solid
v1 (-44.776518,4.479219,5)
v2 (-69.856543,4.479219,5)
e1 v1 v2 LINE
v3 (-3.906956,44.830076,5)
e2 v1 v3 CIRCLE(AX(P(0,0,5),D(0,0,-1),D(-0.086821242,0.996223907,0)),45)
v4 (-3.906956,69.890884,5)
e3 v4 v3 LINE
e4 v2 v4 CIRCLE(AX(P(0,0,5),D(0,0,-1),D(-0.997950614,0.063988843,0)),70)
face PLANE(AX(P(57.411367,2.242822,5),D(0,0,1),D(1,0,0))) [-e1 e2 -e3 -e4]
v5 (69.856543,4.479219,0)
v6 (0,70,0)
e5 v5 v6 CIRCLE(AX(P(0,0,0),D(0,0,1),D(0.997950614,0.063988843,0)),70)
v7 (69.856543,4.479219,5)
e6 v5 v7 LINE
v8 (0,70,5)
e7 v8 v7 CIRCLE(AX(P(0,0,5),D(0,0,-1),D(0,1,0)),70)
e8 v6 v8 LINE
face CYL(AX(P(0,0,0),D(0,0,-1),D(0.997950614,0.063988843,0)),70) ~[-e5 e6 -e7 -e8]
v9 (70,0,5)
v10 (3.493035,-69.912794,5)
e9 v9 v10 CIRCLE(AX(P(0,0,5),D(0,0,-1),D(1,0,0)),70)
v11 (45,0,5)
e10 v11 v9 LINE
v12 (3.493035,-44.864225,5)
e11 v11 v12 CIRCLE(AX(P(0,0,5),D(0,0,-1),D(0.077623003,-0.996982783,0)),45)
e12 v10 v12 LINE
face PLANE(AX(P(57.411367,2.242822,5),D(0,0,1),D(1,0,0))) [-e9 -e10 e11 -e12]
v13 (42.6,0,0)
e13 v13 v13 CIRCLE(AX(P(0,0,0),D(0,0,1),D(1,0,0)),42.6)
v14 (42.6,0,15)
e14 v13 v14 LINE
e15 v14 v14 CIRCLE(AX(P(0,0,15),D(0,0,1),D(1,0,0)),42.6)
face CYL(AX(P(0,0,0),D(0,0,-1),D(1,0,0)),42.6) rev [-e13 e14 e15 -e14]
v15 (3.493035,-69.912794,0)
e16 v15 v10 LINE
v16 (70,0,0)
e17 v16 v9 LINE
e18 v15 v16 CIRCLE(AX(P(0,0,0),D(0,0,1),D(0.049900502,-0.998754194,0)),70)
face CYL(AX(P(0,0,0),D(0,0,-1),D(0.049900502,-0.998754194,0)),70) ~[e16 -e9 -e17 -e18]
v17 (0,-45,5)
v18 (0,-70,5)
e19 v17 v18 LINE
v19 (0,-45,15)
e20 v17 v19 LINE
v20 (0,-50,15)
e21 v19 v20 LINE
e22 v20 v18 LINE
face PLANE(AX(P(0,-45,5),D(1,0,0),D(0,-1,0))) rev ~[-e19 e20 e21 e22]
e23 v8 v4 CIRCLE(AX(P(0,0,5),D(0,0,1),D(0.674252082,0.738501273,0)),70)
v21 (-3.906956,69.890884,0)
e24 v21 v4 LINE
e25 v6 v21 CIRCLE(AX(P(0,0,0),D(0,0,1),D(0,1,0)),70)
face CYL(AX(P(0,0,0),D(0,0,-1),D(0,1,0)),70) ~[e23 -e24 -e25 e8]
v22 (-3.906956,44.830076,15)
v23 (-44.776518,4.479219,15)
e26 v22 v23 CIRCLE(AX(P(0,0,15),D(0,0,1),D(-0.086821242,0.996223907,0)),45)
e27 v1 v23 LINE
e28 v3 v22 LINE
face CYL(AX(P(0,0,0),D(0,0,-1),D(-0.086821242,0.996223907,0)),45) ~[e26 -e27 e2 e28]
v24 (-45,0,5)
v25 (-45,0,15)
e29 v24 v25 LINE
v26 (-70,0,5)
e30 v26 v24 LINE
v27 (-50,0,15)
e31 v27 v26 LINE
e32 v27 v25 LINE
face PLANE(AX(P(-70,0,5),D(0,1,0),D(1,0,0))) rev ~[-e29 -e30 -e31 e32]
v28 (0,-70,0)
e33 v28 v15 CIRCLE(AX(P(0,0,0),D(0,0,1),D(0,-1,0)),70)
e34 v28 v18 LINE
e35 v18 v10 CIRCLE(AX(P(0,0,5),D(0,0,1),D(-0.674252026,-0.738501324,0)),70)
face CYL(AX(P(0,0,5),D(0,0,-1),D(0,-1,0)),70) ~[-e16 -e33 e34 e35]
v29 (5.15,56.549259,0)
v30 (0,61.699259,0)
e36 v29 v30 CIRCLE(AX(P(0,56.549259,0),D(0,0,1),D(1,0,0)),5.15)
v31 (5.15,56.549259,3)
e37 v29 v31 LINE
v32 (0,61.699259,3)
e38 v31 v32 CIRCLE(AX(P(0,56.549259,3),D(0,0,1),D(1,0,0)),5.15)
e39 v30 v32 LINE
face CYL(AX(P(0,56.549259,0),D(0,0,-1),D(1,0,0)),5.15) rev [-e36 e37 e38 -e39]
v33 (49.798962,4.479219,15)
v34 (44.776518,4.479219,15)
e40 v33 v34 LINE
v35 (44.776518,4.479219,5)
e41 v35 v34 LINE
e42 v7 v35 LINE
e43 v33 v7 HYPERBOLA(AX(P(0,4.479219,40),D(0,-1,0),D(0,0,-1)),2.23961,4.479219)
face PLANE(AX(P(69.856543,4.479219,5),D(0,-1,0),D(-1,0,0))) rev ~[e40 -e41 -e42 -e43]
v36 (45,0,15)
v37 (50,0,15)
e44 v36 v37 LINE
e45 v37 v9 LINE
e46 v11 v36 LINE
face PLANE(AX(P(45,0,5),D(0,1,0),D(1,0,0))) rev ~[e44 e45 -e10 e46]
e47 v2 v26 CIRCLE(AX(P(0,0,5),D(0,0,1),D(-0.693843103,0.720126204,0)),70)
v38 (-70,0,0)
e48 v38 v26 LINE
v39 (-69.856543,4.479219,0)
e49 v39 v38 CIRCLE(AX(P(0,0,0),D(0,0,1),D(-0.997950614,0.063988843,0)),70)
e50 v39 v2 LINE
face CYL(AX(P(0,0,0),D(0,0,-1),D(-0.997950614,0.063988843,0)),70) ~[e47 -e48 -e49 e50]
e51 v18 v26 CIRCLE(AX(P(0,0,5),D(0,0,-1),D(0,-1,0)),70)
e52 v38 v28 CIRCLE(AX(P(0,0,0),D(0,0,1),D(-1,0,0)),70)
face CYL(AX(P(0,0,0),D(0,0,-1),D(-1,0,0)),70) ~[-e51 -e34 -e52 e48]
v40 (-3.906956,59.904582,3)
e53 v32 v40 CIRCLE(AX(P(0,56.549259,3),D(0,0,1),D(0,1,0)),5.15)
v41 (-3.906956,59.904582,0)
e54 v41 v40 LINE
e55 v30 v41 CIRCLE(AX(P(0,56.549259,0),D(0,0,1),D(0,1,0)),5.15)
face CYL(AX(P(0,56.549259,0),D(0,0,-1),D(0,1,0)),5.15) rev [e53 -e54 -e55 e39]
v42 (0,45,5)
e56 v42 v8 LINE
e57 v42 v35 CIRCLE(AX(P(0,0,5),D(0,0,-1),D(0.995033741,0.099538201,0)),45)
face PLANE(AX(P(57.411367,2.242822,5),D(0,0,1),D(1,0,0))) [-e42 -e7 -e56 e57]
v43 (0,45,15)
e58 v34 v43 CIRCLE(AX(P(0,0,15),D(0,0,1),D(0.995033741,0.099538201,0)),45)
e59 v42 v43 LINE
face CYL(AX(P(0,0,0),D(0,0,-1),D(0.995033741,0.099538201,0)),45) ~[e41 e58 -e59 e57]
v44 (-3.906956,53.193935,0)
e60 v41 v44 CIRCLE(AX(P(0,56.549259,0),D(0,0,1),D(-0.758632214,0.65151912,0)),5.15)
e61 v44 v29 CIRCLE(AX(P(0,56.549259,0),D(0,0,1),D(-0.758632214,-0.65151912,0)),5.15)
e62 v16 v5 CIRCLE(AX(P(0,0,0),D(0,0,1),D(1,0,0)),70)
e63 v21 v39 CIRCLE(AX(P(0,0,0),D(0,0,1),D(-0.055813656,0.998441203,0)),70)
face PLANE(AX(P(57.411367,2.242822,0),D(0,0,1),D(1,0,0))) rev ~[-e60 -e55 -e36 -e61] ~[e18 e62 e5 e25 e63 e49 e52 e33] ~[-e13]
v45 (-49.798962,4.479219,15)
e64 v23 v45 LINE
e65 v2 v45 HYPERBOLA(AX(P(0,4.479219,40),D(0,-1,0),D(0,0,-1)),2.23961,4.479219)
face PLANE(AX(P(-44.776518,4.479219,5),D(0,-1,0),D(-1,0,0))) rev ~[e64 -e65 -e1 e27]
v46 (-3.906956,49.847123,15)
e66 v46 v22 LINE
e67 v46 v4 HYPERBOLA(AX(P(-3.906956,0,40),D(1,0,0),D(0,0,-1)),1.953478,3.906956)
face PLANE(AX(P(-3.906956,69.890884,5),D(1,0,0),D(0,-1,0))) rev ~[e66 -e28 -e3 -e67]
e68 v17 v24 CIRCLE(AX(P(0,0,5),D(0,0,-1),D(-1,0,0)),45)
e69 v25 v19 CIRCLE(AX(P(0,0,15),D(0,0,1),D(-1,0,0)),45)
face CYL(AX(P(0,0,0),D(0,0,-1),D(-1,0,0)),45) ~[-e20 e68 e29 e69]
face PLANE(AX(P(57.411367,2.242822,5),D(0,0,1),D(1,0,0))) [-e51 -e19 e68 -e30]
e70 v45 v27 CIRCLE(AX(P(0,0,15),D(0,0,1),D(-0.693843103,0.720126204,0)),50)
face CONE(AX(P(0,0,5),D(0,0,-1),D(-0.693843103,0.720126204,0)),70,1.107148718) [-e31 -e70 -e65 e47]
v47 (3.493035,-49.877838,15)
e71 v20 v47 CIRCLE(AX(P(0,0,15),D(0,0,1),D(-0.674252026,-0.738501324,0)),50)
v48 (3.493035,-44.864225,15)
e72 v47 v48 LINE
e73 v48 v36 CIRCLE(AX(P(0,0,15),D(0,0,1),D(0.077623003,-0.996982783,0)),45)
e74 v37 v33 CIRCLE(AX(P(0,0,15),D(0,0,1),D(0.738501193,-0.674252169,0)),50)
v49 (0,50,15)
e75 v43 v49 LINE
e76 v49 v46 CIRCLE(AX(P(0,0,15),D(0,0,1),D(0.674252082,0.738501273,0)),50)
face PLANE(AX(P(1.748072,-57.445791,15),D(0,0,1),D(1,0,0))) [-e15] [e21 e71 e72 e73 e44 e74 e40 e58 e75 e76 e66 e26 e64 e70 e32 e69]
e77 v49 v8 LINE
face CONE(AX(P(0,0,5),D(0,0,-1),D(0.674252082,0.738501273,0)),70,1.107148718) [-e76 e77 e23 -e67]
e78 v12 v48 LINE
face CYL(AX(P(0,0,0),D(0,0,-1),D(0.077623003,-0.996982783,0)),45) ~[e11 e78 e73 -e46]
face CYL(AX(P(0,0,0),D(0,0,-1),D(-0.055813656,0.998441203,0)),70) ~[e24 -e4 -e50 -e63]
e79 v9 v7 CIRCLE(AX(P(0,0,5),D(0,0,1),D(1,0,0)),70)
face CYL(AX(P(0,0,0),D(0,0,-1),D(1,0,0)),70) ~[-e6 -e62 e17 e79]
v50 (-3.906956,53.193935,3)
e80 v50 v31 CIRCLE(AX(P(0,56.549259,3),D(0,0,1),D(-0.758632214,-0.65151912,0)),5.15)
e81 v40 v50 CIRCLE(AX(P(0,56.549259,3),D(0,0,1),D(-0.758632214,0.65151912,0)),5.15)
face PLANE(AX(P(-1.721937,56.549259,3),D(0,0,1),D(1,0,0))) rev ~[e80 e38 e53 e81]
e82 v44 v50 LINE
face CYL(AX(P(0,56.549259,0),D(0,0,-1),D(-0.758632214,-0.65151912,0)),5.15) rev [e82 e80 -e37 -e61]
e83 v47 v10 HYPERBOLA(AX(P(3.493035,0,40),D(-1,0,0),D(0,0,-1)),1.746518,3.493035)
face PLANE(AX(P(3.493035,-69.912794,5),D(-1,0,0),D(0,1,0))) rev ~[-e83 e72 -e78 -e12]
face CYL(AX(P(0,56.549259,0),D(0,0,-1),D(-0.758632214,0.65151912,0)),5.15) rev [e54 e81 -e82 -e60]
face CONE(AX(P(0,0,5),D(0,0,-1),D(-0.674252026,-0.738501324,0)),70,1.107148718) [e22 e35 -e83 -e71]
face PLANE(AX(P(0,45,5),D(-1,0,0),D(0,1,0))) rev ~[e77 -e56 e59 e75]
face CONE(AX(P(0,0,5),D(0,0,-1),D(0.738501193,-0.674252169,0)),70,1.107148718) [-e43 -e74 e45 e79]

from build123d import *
from build123d import SkipClean  # not in build123d's __all__

# Parameters (mm, degrees)
F0_R        = 42.6
F1_DEPTH    = 5
F2_DEPTH    = 15
F3_DEPTH    = 3
F4_START    = 5
F4_DEPTH    = 10
F5_T2_ANGLE = 88.4610047723
F5_T4_ANGLE = 87.6524613708
F5_T6_ANGLE = 88.4610047722
F5_T8_ANGLE = 87.9917435352


# Not quite as in the source:
# - a fillet or chamfer that OpenCascade refuses, or shapes differently, is made with other operations: its cross-section is extruded or revolved along the edge and cut away or added


with BuildPart() as f1:
    # F0 (on Top) → F1 (new body)
    with BuildSketch(Plane.XY):
        with BuildLine():
            Line((45, 0), (70, 0))
            ThreePointArc((70, 0), (69.9641265525, 2.2407578514), (69.8565429786, 4.4792190254))
            Line((69.8565429786, 4.4792190254), (44.7765183654, 4.4792190254))
            ThreePointArc((44.7765183654, 4.4792190254), (44.9440948648, 2.2423953219), (45, 0))
        make_face()
        with BuildLine():
            Line((44.7765183654, 4.4792190254), (69.8565429786, 4.4792190254))
            ThreePointArc((69.8565429786, 4.4792190254), (47.8876532533, 51.0565633968), (0, 70))
            Line((0, 70), (0, 61.6992585301))
            ThreePointArc((0, 61.6992585301), (3.6415999231, 60.1908584533), (5.15, 56.5492585301))
            ThreePointArc((5.15, 56.5492585301), (3.6415999231, 52.907658607), (0, 51.3992585301))
            Line((0, 51.3992585301), (0, 45))
            ThreePointArc((0, 45), (30.194661315, 33.3658871914), (44.7765183654, 4.4792190254))
        make_face()
        with BuildLine():
            Line((0, 61.6992585301), (0, 70))
            ThreePointArc((0, 70), (-1.9542396645, 69.972715735), (-3.9069559007, 69.8908842095))
            Line((-3.9069559007, 69.8908842095), (-3.9069559007, 59.9045820004))
            ThreePointArc((-3.9069559007, 59.9045820004), (-2.1497190663, 61.2291311711), (0, 61.6992585301))
        make_face()
        with BuildLine():
            Line((-3.9069559007, 59.9045820004), (-3.9069559007, 69.8908842095))
            ThreePointArc((-3.9069559007, 69.8908842095), (-49.2943701377, 49.699749222), (-69.8565429786, 4.4792190254))
            Line((-69.8565429786, 4.4792190254), (-44.7765183654, 4.4792190254))
            ThreePointArc((-44.7765183654, 4.4792190254), (-31.6159465637, 32.0223659788), (-3.9069559007, 44.8300757928))
            Line((-3.9069559007, 44.8300757928), (-3.9069559007, 53.1939350599))
            ThreePointArc((-3.9069559007, 53.1939350599), (-5.15, 56.5492585301), (-3.9069559007, 59.9045820004))
        make_face()
        with BuildLine():
            ThreePointArc((-69.8565429786, 4.4792190254), (-69.9641265525, 2.2407578514), (-70, 0))
            Line((-70, 0), (-45, 0))
            ThreePointArc((-45, 0), (-44.9440948648, 2.2423953219), (-44.7765183654, 4.4792190254))
            Line((-44.7765183654, 4.4792190254), (-69.8565429786, 4.4792190254))
        make_face()
        with BuildLine():
            ThreePointArc((-70, 0), (-49.4974746831, -49.4974746831), (0, -70))
            Line((0, -70), (0, -45))
            ThreePointArc((0, -45), (-31.8198051534, -31.8198051534), (-45, 0))
            Line((-45, 0), (-70, 0))
        make_face()
        with BuildLine():
            ThreePointArc((0, -70), (1.7470617825, -69.9781949976), (3.4930351455, -69.9127935751))
            Line((3.4930351455, -69.9127935751), (3.4930351455, -44.8642252298))
            ThreePointArc((3.4930351455, -44.8642252298), (1.7478364709, -44.9660434959), (0, -45))
            Line((0, -45), (0, -70))
        make_face()
        with BuildLine():
            ThreePointArc((3.4930351455, -69.9127935751), (50.7174154516, -48.2466969844), (70, 0))
            Line((70, 0), (45, 0))
            ThreePointArc((45, 0), (33.0317013, -30.5598872581), (3.4930351455, -44.8642252298))
            Line((3.4930351455, -44.8642252298), (3.4930351455, -69.9127935751))
        make_face()
        with BuildLine():
            Line((0, 51.3992585301), (0, 61.6992585301))
            ThreePointArc((0, 61.6992585301), (-2.1497190663, 61.2291311711), (-3.9069559007, 59.9045820004))
            Line((-3.9069559007, 59.9045820004), (-3.9069559007, 53.1939350599))
            ThreePointArc((-3.9069559007, 53.1939350599), (-2.1497190663, 51.8693858891), (0, 51.3992585301))
        make_face()
        with BuildLine():
            Line((-3.9069559007, 53.1939350599), (-3.9069559007, 59.9045820004))
            ThreePointArc((-3.9069559007, 59.9045820004), (-5.15, 56.5492585301), (-3.9069559007, 53.1939350599))
        make_face()
        with BuildLine():
            ThreePointArc((5.15, 56.5492585301), (3.6415999231, 60.1908584533), (0, 61.6992585301))
            Line((0, 61.6992585301), (0, 51.3992585301))
            ThreePointArc((0, 51.3992585301), (3.6415999231, 52.907658607), (5.15, 56.5492585301))
        make_face()
        with BuildLine():
            ThreePointArc((-3.9069559007, 44.8300757928), (-1.9553246946, 44.9574988777), (0, 45))
            Line((0, 45), (0, 51.3992585301))
            ThreePointArc((0, 51.3992585301), (-2.1497190663, 51.8693858891), (-3.9069559007, 53.1939350599))
            Line((-3.9069559007, 53.1939350599), (-3.9069559007, 44.8300757928))
        make_face()
        with BuildLine():
            ThreePointArc((3.4930351455, -44.8642252298), (33.0317013, -30.5598872581), (45, 0))
            ThreePointArc((45, 0), (44.9440948648, 2.2423953219), (44.7765183654, 4.4792190254))
            ThreePointArc((44.7765183654, 4.4792190254), (30.194661315, 33.3658871914), (0, 45))
            ThreePointArc((0, 45), (-1.9553246946, 44.9574988777), (-3.9069559007, 44.8300757928))
            ThreePointArc((-3.9069559007, 44.8300757928), (-31.6159465637, 32.0223659788), (-44.7765183654, 4.4792190254))
            ThreePointArc((-44.7765183654, 4.4792190254), (-44.9440948648, 2.2423953219), (-45, 0))
            ThreePointArc((-45, 0), (-31.8198051534, -31.8198051534), (0, -45))
            ThreePointArc((0, -45), (1.7478364709, -44.9660434959), (3.4930351455, -44.8642252298))
        make_face()
        Circle(F0_R, mode=Mode.SUBTRACT)
    extrude(amount=F1_DEPTH)

    # F0 (on Top) → F2 (join)
    with BuildSketch(Plane.XY):
        with BuildLine():
            ThreePointArc((3.4930351455, -44.8642252298), (33.0317013, -30.5598872581), (45, 0))
            ThreePointArc((45, 0), (44.9440948648, 2.2423953219), (44.7765183654, 4.4792190254))
            ThreePointArc((44.7765183654, 4.4792190254), (30.194661315, 33.3658871914), (0, 45))
            ThreePointArc((0, 45), (-1.9553246946, 44.9574988777), (-3.9069559007, 44.8300757928))
            ThreePointArc((-3.9069559007, 44.8300757928), (-31.6159465637, 32.0223659788), (-44.7765183654, 4.4792190254))
            ThreePointArc((-44.7765183654, 4.4792190254), (-44.9440948648, 2.2423953219), (-45, 0))
            ThreePointArc((-45, 0), (-31.8198051534, -31.8198051534), (0, -45))
            ThreePointArc((0, -45), (1.7478364709, -44.9660434959), (3.4930351455, -44.8642252298))
        make_face()
        Circle(F0_R, mode=Mode.SUBTRACT)
    extrude(amount=F2_DEPTH)

    # F0 (on Top) → F3 (cut)
    with BuildSketch(Plane.XY):
        with BuildLine():
            Line((0, 51.3992585301), (0, 61.6992585301))
            ThreePointArc((0, 61.6992585301), (-2.1497190663, 61.2291311711), (-3.9069559007, 59.9045820004))
            Line((-3.9069559007, 59.9045820004), (-3.9069559007, 53.1939350599))
            ThreePointArc((-3.9069559007, 53.1939350599), (-2.1497190663, 51.8693858891), (0, 51.3992585301))
        make_face()
        with BuildLine():
            ThreePointArc((5.15, 56.5492585301), (3.6415999231, 60.1908584533), (0, 61.6992585301))
            Line((0, 61.6992585301), (0, 51.3992585301))
            ThreePointArc((0, 51.3992585301), (3.6415999231, 52.907658607), (5.15, 56.5492585301))
        make_face()
        with BuildLine():
            Line((-3.9069559007, 53.1939350599), (-3.9069559007, 59.9045820004))
            ThreePointArc((-3.9069559007, 59.9045820004), (-5.15, 56.5492585301), (-3.9069559007, 53.1939350599))
        make_face()
    extrude(amount=F3_DEPTH, mode=Mode.SUBTRACT)

    # F0 (on Top) → F4 (join)
    with BuildSketch(Plane.XY.offset(F4_START)):
        with BuildLine():
            ThreePointArc((0, -70), (1.7470617825, -69.9781949976), (3.4930351455, -69.9127935751))
            Line((3.4930351455, -69.9127935751), (3.4930351455, -44.8642252298))
            ThreePointArc((3.4930351455, -44.8642252298), (1.7478364709, -44.9660434959), (0, -45))
            Line((0, -45), (0, -70))
        make_face()
        with BuildLine():
            ThreePointArc((-69.8565429786, 4.4792190254), (-69.9641265525, 2.2407578514), (-70, 0))
            Line((-70, 0), (-45, 0))
            ThreePointArc((-45, 0), (-44.9440948648, 2.2423953219), (-44.7765183654, 4.4792190254))
            Line((-44.7765183654, 4.4792190254), (-69.8565429786, 4.4792190254))
        make_face()
        with BuildLine():
            Line((45, 0), (70, 0))
            ThreePointArc((70, 0), (69.9641265525, 2.2407578514), (69.8565429786, 4.4792190254))
            Line((69.8565429786, 4.4792190254), (44.7765183654, 4.4792190254))
            ThreePointArc((44.7765183654, 4.4792190254), (44.9440948648, 2.2423953219), (45, 0))
        make_face()
        with BuildLine():
            Line((0, 51.3992585301), (0, 61.6992585301))
            ThreePointArc((0, 61.6992585301), (-2.1497190663, 61.2291311711), (-3.9069559007, 59.9045820004))
            Line((-3.9069559007, 59.9045820004), (-3.9069559007, 53.1939350599))
            ThreePointArc((-3.9069559007, 53.1939350599), (-2.1497190663, 51.8693858891), (0, 51.3992585301))
        make_face()
        with BuildLine():
            Line((0, 61.6992585301), (0, 70))
            ThreePointArc((0, 70), (-1.9542396645, 69.972715735), (-3.9069559007, 69.8908842095))
            Line((-3.9069559007, 69.8908842095), (-3.9069559007, 59.9045820004))
            ThreePointArc((-3.9069559007, 59.9045820004), (-2.1497190663, 61.2291311711), (0, 61.6992585301))
        make_face()
        with BuildLine():
            ThreePointArc((-3.9069559007, 44.8300757928), (-1.9553246946, 44.9574988777), (0, 45))
            Line((0, 45), (0, 51.3992585301))
            ThreePointArc((0, 51.3992585301), (-2.1497190663, 51.8693858891), (-3.9069559007, 53.1939350599))
            Line((-3.9069559007, 53.1939350599), (-3.9069559007, 44.8300757928))
        make_face()
    with SkipClean():  # cleaning this boolean's faces spoils the solid; the shape is the same uncleaned
        extrude(amount=F4_DEPTH)

    # F5: chamfer of 20 x 10 on 4 edges, made by hand

    # F5_s1 → F5_t2 (revolve, cut)
    with BuildSketch(Plane(origin=(0, 0, 0), x_dir=(0, 0, 1), z_dir=(-0.6742521694, -0.738501193, 0))):
        Polygon((5, -70), (15, -50), (15, -70), align=None)
    revolve(axis=Axis((0, 0, 15), (0, 0, 1)), revolution_arc=F5_T2_ANGLE, mode=Mode.SUBTRACT)

    # F5_s3 → F5_t4 (revolve, cut)
    with BuildSketch(Plane(origin=(0, 0, 0), x_dir=(0, 0, 1), z_dir=(-0.7385013236, 0.6742520264, 0))):
        Polygon((5, -70), (15, -50), (15, -70), align=None)
    revolve(axis=Axis((0, 0, 15), (0, 0, 1)), revolution_arc=F5_T4_ANGLE, mode=Mode.SUBTRACT)

    # F5_s5 → F5_t6 (revolve, cut)
    with BuildSketch(Plane(origin=(0, 0, 0), x_dir=(0, 0, 1), z_dir=(0.7201262035, 0.6938431026, 0))):
        Polygon((5, -70), (15, -50), (15, -70), align=None)
    revolve(axis=Axis((0, 0, 15), (0, 0, 1)), revolution_arc=F5_T6_ANGLE, mode=Mode.SUBTRACT)

    # F5_s7 → F5_t8 (revolve, cut)
    with BuildSketch(Plane(origin=(0, 0, 0), x_dir=(0, 0, 1), z_dir=(0.7385012727, -0.6742520821, 0))):
        Polygon((5, -70), (15, -50), (15, -70), align=None)
    revolve(axis=Axis((0, 0, 15), (0, 0, 1)), revolution_arc=F5_T8_ANGLE, mode=Mode.SUBTRACT)


solid = f1.part
